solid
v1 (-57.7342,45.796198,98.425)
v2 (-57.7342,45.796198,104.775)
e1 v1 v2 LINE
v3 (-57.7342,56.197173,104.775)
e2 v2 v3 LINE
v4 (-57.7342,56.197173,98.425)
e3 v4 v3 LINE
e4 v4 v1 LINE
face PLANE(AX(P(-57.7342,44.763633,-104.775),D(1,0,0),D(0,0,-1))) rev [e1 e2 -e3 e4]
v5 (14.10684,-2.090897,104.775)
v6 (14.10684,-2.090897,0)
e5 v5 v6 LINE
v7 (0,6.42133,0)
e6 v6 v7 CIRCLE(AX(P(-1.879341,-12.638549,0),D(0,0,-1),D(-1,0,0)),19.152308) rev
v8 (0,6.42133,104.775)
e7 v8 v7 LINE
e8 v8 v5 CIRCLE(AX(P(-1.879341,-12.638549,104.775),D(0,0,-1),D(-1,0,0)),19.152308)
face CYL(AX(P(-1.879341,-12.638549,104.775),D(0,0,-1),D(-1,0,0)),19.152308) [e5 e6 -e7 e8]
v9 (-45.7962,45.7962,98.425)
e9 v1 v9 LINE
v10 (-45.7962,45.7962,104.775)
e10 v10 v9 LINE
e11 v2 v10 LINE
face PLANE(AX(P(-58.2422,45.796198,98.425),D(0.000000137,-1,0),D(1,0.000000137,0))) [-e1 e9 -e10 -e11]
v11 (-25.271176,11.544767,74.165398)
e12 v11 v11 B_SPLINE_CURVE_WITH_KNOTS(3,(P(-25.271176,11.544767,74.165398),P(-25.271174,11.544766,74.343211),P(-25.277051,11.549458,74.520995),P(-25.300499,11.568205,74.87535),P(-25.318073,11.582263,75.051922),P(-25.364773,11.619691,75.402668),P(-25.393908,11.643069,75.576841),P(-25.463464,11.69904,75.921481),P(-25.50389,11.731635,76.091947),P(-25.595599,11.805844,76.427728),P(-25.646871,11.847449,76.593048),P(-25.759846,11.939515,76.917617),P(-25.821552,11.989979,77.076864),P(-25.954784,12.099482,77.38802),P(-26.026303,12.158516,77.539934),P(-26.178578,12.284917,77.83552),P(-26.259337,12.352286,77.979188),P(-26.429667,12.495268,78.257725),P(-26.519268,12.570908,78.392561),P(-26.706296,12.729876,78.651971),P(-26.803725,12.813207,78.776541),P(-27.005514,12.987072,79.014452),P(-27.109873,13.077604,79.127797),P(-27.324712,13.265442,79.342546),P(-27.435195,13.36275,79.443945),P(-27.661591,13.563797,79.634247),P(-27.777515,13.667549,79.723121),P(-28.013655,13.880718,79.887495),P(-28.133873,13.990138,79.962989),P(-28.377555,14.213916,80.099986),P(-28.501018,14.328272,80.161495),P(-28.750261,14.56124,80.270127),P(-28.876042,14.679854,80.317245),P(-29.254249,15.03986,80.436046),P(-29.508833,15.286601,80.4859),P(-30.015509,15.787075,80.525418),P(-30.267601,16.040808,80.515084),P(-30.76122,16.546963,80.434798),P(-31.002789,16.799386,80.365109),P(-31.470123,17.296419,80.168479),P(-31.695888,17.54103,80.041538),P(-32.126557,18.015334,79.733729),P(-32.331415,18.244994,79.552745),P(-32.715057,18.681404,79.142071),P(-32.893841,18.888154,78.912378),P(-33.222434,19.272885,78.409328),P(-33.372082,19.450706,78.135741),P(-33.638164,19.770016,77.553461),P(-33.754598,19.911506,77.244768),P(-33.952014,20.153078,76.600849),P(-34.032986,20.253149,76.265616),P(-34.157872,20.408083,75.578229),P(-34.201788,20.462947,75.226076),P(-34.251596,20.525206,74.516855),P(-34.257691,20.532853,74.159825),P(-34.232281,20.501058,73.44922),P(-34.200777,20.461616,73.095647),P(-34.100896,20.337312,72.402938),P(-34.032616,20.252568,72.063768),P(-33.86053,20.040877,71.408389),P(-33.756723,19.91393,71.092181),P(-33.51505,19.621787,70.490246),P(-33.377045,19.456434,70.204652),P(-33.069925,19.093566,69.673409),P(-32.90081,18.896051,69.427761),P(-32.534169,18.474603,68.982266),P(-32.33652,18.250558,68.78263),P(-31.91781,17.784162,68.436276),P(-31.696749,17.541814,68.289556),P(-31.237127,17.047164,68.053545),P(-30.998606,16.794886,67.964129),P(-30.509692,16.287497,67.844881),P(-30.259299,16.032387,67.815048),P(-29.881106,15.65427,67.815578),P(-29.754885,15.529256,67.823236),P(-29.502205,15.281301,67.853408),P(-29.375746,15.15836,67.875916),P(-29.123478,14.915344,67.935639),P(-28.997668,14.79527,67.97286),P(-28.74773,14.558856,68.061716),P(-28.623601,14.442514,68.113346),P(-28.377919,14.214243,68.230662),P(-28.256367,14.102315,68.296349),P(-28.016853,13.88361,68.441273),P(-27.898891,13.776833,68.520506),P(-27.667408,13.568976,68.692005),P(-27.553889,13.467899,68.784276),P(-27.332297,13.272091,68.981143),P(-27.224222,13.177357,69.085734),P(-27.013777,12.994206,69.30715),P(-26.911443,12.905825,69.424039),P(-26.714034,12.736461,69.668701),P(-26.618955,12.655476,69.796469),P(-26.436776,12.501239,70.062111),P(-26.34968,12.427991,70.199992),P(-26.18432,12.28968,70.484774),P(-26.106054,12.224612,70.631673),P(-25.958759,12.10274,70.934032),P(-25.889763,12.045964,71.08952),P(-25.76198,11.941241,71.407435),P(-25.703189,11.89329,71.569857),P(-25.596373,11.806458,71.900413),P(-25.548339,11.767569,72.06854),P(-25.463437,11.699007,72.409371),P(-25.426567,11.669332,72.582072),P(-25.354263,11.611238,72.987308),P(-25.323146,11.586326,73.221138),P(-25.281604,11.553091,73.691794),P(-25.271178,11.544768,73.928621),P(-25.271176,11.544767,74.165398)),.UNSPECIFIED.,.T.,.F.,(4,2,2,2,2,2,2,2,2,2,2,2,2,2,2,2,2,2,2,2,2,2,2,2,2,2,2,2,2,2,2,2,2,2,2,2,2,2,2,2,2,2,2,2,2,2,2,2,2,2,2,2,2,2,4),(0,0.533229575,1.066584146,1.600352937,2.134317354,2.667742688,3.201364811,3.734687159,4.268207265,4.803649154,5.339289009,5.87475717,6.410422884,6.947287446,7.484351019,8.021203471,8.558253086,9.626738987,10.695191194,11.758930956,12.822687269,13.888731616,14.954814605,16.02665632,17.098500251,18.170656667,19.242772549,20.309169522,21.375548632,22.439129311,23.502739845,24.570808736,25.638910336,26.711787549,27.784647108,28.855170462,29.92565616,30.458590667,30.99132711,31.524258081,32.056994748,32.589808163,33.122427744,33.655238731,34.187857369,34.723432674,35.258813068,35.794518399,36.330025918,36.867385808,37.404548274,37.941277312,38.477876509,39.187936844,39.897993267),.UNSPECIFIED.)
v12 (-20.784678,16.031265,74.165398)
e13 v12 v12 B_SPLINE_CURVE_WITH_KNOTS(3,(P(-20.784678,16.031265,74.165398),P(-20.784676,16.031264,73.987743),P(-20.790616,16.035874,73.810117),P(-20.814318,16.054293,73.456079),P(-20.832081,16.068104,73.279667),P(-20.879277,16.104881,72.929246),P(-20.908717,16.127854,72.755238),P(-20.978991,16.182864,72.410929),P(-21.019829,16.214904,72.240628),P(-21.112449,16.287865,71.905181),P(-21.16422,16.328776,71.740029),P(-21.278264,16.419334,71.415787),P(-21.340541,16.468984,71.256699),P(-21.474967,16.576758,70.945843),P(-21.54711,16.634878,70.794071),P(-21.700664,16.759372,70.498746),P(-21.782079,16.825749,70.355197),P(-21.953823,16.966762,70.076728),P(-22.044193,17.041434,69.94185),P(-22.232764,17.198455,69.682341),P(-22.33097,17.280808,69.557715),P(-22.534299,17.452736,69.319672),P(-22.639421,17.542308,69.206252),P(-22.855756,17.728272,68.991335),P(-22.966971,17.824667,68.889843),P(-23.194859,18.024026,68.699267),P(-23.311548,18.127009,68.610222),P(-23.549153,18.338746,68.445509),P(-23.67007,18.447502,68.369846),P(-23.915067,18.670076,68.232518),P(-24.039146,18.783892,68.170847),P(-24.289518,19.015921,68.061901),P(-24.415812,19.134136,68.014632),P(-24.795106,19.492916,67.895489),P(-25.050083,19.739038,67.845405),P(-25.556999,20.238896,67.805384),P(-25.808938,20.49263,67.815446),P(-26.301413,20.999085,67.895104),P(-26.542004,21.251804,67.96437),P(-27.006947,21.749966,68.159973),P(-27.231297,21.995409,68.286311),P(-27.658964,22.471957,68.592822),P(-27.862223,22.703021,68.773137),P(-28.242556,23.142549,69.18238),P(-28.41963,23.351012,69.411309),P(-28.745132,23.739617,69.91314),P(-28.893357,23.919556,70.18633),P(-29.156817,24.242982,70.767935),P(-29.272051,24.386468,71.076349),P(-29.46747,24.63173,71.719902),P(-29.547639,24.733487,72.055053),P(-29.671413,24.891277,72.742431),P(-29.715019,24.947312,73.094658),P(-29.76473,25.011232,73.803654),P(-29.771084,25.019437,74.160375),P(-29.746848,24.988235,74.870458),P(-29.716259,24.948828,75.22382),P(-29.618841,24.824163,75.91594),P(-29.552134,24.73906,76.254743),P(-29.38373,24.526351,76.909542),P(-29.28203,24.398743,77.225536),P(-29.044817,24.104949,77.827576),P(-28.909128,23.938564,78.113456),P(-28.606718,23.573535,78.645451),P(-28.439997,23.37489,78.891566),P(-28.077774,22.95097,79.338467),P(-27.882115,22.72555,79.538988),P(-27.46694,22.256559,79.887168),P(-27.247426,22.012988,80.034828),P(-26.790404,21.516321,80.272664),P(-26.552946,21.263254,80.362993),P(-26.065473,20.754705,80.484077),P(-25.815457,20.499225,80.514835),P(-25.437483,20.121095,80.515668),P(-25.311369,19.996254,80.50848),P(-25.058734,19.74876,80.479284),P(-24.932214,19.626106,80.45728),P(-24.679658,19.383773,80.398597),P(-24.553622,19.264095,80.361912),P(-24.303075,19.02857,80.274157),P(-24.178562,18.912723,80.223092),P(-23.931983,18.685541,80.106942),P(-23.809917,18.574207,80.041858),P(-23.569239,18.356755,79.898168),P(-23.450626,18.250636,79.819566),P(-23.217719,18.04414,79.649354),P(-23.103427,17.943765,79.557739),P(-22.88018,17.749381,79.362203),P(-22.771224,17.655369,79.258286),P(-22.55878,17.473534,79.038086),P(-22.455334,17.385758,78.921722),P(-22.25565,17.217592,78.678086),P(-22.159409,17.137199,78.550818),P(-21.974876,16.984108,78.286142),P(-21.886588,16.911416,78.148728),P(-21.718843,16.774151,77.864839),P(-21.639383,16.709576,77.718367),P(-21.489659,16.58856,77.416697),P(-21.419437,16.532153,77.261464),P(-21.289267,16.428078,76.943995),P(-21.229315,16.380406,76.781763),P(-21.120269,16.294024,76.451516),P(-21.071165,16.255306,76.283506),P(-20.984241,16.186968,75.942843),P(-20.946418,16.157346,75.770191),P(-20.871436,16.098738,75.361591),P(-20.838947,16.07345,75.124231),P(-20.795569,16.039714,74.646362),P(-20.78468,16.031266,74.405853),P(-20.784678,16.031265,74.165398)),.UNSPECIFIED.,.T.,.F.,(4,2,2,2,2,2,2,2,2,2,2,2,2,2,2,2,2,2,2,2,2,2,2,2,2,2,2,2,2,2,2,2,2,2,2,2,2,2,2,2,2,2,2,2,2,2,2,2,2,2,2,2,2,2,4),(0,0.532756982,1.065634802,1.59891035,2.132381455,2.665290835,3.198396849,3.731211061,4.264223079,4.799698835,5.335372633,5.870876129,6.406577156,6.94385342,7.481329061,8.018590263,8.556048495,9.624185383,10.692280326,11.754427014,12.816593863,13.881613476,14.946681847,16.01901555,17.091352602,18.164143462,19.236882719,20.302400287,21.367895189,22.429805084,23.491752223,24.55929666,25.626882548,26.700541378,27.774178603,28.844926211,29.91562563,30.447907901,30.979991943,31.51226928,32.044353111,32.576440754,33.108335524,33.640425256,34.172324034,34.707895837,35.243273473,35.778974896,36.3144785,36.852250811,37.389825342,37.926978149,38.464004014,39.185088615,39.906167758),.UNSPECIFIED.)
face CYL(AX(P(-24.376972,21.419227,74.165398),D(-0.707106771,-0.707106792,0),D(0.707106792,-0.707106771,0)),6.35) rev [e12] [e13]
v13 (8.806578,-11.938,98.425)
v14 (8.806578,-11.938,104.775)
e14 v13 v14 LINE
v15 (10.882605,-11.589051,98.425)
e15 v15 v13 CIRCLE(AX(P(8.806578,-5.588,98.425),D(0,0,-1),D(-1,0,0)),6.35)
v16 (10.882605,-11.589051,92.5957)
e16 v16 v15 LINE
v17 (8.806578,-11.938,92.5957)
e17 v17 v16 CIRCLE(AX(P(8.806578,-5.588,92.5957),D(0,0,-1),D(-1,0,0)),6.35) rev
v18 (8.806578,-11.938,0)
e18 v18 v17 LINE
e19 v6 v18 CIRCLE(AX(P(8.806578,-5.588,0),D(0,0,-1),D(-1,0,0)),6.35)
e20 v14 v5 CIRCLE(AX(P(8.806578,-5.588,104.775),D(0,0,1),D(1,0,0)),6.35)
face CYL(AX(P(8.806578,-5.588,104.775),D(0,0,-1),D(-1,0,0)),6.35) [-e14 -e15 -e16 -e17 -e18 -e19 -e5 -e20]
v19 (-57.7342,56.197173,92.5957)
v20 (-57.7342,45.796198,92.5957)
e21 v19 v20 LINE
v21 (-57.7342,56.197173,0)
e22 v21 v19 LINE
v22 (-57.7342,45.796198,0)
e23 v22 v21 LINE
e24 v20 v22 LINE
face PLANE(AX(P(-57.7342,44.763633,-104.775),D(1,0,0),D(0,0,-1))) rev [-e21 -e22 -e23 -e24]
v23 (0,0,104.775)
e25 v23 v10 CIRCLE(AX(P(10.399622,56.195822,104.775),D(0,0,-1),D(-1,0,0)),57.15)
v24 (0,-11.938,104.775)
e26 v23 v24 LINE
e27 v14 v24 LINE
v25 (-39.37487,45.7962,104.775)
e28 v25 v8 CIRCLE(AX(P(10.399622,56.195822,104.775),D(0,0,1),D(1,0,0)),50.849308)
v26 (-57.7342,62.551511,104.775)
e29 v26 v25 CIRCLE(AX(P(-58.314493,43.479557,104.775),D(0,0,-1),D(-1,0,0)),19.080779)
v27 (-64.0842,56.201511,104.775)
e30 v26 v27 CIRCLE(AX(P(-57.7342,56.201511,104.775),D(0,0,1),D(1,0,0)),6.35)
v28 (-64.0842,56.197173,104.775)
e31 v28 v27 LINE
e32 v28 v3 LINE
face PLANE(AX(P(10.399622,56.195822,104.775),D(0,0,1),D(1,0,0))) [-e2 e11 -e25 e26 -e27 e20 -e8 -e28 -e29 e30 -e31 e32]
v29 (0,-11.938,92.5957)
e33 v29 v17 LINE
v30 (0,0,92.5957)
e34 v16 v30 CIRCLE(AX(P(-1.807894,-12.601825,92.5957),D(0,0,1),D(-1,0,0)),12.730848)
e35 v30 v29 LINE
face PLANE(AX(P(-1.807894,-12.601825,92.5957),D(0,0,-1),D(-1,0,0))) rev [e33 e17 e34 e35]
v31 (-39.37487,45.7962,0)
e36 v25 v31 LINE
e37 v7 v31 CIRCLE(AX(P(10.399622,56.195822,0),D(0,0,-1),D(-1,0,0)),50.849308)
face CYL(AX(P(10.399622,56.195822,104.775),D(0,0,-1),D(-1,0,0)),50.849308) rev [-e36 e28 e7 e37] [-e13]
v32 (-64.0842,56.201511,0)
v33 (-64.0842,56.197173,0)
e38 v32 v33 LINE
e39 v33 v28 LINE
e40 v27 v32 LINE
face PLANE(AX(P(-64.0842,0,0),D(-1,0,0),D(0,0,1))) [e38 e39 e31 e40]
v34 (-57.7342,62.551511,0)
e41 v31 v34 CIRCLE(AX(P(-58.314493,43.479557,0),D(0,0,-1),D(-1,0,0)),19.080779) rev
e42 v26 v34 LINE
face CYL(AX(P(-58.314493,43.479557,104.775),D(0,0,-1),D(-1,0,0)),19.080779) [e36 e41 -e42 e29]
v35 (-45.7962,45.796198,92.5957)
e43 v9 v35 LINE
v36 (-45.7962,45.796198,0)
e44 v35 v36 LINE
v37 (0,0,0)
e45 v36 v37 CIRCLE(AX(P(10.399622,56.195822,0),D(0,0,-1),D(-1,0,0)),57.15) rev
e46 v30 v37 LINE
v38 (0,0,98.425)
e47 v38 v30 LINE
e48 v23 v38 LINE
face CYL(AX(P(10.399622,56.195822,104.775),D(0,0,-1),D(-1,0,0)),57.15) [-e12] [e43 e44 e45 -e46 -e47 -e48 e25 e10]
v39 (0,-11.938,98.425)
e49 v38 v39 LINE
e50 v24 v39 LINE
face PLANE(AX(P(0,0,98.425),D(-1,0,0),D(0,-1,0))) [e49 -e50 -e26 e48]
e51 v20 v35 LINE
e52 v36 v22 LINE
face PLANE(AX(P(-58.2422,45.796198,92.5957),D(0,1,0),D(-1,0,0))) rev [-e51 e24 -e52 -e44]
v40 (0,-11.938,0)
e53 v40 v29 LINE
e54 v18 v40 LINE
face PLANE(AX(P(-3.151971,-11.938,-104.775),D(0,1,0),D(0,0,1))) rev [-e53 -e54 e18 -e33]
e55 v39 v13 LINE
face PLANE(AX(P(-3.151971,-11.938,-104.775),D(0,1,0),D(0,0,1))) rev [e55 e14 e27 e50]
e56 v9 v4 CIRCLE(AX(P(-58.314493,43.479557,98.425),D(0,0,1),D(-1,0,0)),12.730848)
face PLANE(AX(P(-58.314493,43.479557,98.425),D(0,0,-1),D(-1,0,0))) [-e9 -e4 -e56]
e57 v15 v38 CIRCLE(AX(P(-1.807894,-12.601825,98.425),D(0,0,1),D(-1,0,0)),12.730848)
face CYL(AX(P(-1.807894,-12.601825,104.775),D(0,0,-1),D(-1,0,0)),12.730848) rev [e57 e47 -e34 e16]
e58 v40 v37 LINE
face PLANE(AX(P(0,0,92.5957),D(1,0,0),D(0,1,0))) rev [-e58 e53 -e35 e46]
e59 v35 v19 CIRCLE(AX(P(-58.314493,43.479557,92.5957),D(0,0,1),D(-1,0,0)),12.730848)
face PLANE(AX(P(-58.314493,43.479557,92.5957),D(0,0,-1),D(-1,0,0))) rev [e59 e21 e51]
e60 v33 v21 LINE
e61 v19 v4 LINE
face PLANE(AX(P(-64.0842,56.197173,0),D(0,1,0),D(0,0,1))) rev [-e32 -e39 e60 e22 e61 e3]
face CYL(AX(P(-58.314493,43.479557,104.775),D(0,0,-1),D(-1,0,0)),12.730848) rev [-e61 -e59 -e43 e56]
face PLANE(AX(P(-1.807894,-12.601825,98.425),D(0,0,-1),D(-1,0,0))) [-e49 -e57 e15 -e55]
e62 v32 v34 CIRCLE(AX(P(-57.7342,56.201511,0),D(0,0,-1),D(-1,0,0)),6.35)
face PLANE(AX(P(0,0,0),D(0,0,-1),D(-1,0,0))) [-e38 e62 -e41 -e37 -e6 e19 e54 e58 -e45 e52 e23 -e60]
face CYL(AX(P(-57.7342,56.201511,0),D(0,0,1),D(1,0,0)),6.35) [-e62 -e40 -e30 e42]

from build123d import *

# Parameters (mm, degrees)
BOSS_EXTRUDE1_DEPTH = 104.775
BOSS_EXTRUDE2_DEPTH = 92.5957
BOSS_EXTRUDE3_START = -5.8293
BOSS_EXTRUDE3_DEPTH = 5.8293
BOSS_EXTRUDE4_DEPTH = 6.35
SKETCH5_W           = 7.787485422
SKETCH5_H           = 19.833751934
SKETCH5_W_2         = 22.754058967
SKETCH5_H_2         = 3.407024872
CUT_EXTRUDE1_DEPTH  = 227.312030137
SKETCH6_R           = 6.35
CUT_EXTRUDE2_DEPTH  = 6.35
SKETCH7_W           = 111.054240747
SKETCH7_H           = 89.646194338
CUT_EXTRUDE3_DEPTH  = 104.775
SKETCH8_W           = 104.775
SKETCH8_H           = 6.354337814
BOSS_EXTRUDE5_DEPTH = 6.35
FILLET1_R           = 6.35


with BuildPart() as part:
    # Sketch1 → Boss-Extrude1 (new, symmetric)
    with BuildSketch(Plane.XY):
        with BuildLine():
            Line((-58.2422, 56.2102), (-58.2422, 62.5602))
            ThreePointArc((-58.2422, 62.5602), (-45.640852469, 57.743322347), (-39.3748699, 45.7962))
            ThreePointArc((-39.3748699, 45.7962), (-25.556268964, 20.239931036), (0, 6.4213301))
            ThreePointArc((0, 6.4213301), (12.247457496, 0.293755183), (17.272, -12.446))
            Line((17.272, -12.446), (10.922, -12.446))
            ThreePointArc((10.922, -12.446), (7.760938146, -4.204686933), (0, 0))
            ThreePointArc((0, 0), (-30.011530905, 15.784669095), (-45.7962, 45.7962))
            ThreePointArc((-45.7962, 45.7962), (-50.144819563, 53.243313205), (-58.2422, 56.2102))
        make_face()
    extrude(amount=BOSS_EXTRUDE1_DEPTH, both=True)


with BuildPart() as boss_extrude2_tool:
    # Sketch2 → Boss-Extrude2 (new, symmetric)
    with BuildSketch(Plane.XY):
        with BuildLine():
            Line((-58.2422, 56.2102), (-58.2422, 45.796198296))
            Line((-58.2422, 45.796198296), (-45.796199685, 45.796198296))
            ThreePointArc((-45.796199685, 45.796198296), (-50.144818899, 53.243312648), (-58.2422, 56.2102))
        make_face()
        with BuildLine():
            Line((0, 0), (0, -12.446))
            Line((0, -12.446), (10.922, -12.446))
            ThreePointArc((10.922, -12.446), (7.760938146, -4.204686933), (0, 0))
        make_face()
    extrude(amount=BOSS_EXTRUDE2_DEPTH, both=True)


with BuildPart() as part_1:
    add(part.part)


with BuildPart() as part_2:
    # Boss-Extrude2: joined with boss_extrude2_tool
    add(part_1.part.fuse(boss_extrude2_tool.part, tol=0.00001))

    # Sketch3 → Boss-Extrude3 (add)
    with BuildSketch(Plane(origin=(0, 0, -104.775), x_dir=(-1, 0, 0), z_dir=(0, 0, -1)).offset(BOSS_EXTRUDE3_START)):
        with BuildLine():
            Line((58.2422, 56.2102), (58.2422, 45.796198296))
            Line((58.2422, 45.796198296), (45.7962, 45.7962))
            ThreePointArc((45.7962, 45.7962), (50.144819563, 53.243313205), (58.2422, 56.2102))
        make_face()
        with BuildLine():
            Line((0, 0), (0, -12.446))
            Line((0, -12.446), (-10.922, -12.446))
            ThreePointArc((-10.922, -12.446), (-7.760938146, -4.204686933), (0, 0))
        make_face()
    extrude(amount=BOSS_EXTRUDE3_DEPTH)

    # Sketch4 → Boss-Extrude4 (add)
    with BuildSketch(Plane.XY.offset(104.775)):
        with BuildLine():
            Line((-58.2422, 56.2102), (-58.2422, 45.796198296))
            Line((-58.2422, 45.796198296), (-45.7962, 45.7962))
            ThreePointArc((-45.7962, 45.7962), (-50.144819563, 53.243313205), (-58.2422, 56.2102))
        make_face()
        with BuildLine():
            Line((0, 0), (0, -12.446))
            Line((0, -12.446), (10.922, -12.446))
            ThreePointArc((10.922, -12.446), (7.760938146, -4.204686933), (0, 0))
        make_face()
    extrude(amount=-BOSS_EXTRUDE4_DEPTH)

    # Sketch5 → Cut-Extrude1 (cut, through all)
    with BuildSketch(Plane.XY.offset(104.775)):
        with Locations((-61.627942711, 54.680509116)):
            Rectangle(SKETCH5_W, SKETCH5_H)
        with Locations((8.225058429, -13.641512436)):
            Rectangle(SKETCH5_W_2, SKETCH5_H_2)
    extrude(amount=-CUT_EXTRUDE1_DEPTH, mode=Mode.SUBTRACT)

    # Sketch6 → Cut-Extrude2 (cut, symmetric)
    with BuildSketch(Plane(origin=(-5.969, -5.969000176, 0), x_dir=(-0.7071067916239179, 0.7071067707491772, 0), z_dir=(-0.7071067707491772, -0.7071067916239179, 0))):
        with Locations(Location((32.382802858, -74.165398348, 0), (0, 0, 180))):
            Circle(SKETCH6_R)
    extrude(amount=CUT_EXTRUDE2_DEPTH, both=True, mode=Mode.SUBTRACT)

    # Sketch7 → Cut-Extrude3 (cut)
    with BuildSketch(Plane(origin=(0, 0, -104.775), x_dir=(-1, 0, 0), z_dir=(0, 0, -1))):
        with Locations((26.053941981, 26.416451063)):
            Rectangle(SKETCH7_W, SKETCH7_H)
    extrude(amount=-CUT_EXTRUDE3_DEPTH, mode=Mode.SUBTRACT)

    # Sketch8 → Boss-Extrude5 (add)
    with BuildSketch(Plane.ZY.offset(57.7342)):
        with Locations((52.3875, 59.374341949)):
            Rectangle(SKETCH8_W, SKETCH8_H)
    extrude(amount=BOSS_EXTRUDE5_DEPTH)

    # Fillet1
    # the kernel refuses this fillet: 6.35 mm, written as the material it takes off along each edge
    with BuildSketch(Plane(origin=(-64.0842, 62.551510856, -15.875), x_dir=(1, 0, 0), z_dir=(0, 0, 1))) as fillet1_piece_1:
        with BuildLine():
            CenterArc((FILLET1_R, -FILLET1_R), FILLET1_R, 90, 90)
            Line((0, -FILLET1_R), (0, 0))
            Line((0, 0), (FILLET1_R, 0))
        make_face()
    extrude(amount=136.525, mode=Mode.SUBTRACT)
    with BuildSketch(Plane(origin=(17.260151367, -11.938, -25.849178653), x_dir=(-0.30497213299383213, 0.9523612749882223, 0), z_dir=(0, 0, 1))) as fillet1_piece_2:
        with BuildLine():
            CenterArc((8.625598356, 6.114282737), FILLET1_R, 162.243512631, 123.416753829)
            Line((2.57810426, 8.050855782), (0, 0))
            ThreePointArc((0, 0), (5.169835731, -0.710949564), (10.339671461, 0))
        make_face()
    extrude(amount=156.473357306, mode=Mode.SUBTRACT)


solid = part_2.part
